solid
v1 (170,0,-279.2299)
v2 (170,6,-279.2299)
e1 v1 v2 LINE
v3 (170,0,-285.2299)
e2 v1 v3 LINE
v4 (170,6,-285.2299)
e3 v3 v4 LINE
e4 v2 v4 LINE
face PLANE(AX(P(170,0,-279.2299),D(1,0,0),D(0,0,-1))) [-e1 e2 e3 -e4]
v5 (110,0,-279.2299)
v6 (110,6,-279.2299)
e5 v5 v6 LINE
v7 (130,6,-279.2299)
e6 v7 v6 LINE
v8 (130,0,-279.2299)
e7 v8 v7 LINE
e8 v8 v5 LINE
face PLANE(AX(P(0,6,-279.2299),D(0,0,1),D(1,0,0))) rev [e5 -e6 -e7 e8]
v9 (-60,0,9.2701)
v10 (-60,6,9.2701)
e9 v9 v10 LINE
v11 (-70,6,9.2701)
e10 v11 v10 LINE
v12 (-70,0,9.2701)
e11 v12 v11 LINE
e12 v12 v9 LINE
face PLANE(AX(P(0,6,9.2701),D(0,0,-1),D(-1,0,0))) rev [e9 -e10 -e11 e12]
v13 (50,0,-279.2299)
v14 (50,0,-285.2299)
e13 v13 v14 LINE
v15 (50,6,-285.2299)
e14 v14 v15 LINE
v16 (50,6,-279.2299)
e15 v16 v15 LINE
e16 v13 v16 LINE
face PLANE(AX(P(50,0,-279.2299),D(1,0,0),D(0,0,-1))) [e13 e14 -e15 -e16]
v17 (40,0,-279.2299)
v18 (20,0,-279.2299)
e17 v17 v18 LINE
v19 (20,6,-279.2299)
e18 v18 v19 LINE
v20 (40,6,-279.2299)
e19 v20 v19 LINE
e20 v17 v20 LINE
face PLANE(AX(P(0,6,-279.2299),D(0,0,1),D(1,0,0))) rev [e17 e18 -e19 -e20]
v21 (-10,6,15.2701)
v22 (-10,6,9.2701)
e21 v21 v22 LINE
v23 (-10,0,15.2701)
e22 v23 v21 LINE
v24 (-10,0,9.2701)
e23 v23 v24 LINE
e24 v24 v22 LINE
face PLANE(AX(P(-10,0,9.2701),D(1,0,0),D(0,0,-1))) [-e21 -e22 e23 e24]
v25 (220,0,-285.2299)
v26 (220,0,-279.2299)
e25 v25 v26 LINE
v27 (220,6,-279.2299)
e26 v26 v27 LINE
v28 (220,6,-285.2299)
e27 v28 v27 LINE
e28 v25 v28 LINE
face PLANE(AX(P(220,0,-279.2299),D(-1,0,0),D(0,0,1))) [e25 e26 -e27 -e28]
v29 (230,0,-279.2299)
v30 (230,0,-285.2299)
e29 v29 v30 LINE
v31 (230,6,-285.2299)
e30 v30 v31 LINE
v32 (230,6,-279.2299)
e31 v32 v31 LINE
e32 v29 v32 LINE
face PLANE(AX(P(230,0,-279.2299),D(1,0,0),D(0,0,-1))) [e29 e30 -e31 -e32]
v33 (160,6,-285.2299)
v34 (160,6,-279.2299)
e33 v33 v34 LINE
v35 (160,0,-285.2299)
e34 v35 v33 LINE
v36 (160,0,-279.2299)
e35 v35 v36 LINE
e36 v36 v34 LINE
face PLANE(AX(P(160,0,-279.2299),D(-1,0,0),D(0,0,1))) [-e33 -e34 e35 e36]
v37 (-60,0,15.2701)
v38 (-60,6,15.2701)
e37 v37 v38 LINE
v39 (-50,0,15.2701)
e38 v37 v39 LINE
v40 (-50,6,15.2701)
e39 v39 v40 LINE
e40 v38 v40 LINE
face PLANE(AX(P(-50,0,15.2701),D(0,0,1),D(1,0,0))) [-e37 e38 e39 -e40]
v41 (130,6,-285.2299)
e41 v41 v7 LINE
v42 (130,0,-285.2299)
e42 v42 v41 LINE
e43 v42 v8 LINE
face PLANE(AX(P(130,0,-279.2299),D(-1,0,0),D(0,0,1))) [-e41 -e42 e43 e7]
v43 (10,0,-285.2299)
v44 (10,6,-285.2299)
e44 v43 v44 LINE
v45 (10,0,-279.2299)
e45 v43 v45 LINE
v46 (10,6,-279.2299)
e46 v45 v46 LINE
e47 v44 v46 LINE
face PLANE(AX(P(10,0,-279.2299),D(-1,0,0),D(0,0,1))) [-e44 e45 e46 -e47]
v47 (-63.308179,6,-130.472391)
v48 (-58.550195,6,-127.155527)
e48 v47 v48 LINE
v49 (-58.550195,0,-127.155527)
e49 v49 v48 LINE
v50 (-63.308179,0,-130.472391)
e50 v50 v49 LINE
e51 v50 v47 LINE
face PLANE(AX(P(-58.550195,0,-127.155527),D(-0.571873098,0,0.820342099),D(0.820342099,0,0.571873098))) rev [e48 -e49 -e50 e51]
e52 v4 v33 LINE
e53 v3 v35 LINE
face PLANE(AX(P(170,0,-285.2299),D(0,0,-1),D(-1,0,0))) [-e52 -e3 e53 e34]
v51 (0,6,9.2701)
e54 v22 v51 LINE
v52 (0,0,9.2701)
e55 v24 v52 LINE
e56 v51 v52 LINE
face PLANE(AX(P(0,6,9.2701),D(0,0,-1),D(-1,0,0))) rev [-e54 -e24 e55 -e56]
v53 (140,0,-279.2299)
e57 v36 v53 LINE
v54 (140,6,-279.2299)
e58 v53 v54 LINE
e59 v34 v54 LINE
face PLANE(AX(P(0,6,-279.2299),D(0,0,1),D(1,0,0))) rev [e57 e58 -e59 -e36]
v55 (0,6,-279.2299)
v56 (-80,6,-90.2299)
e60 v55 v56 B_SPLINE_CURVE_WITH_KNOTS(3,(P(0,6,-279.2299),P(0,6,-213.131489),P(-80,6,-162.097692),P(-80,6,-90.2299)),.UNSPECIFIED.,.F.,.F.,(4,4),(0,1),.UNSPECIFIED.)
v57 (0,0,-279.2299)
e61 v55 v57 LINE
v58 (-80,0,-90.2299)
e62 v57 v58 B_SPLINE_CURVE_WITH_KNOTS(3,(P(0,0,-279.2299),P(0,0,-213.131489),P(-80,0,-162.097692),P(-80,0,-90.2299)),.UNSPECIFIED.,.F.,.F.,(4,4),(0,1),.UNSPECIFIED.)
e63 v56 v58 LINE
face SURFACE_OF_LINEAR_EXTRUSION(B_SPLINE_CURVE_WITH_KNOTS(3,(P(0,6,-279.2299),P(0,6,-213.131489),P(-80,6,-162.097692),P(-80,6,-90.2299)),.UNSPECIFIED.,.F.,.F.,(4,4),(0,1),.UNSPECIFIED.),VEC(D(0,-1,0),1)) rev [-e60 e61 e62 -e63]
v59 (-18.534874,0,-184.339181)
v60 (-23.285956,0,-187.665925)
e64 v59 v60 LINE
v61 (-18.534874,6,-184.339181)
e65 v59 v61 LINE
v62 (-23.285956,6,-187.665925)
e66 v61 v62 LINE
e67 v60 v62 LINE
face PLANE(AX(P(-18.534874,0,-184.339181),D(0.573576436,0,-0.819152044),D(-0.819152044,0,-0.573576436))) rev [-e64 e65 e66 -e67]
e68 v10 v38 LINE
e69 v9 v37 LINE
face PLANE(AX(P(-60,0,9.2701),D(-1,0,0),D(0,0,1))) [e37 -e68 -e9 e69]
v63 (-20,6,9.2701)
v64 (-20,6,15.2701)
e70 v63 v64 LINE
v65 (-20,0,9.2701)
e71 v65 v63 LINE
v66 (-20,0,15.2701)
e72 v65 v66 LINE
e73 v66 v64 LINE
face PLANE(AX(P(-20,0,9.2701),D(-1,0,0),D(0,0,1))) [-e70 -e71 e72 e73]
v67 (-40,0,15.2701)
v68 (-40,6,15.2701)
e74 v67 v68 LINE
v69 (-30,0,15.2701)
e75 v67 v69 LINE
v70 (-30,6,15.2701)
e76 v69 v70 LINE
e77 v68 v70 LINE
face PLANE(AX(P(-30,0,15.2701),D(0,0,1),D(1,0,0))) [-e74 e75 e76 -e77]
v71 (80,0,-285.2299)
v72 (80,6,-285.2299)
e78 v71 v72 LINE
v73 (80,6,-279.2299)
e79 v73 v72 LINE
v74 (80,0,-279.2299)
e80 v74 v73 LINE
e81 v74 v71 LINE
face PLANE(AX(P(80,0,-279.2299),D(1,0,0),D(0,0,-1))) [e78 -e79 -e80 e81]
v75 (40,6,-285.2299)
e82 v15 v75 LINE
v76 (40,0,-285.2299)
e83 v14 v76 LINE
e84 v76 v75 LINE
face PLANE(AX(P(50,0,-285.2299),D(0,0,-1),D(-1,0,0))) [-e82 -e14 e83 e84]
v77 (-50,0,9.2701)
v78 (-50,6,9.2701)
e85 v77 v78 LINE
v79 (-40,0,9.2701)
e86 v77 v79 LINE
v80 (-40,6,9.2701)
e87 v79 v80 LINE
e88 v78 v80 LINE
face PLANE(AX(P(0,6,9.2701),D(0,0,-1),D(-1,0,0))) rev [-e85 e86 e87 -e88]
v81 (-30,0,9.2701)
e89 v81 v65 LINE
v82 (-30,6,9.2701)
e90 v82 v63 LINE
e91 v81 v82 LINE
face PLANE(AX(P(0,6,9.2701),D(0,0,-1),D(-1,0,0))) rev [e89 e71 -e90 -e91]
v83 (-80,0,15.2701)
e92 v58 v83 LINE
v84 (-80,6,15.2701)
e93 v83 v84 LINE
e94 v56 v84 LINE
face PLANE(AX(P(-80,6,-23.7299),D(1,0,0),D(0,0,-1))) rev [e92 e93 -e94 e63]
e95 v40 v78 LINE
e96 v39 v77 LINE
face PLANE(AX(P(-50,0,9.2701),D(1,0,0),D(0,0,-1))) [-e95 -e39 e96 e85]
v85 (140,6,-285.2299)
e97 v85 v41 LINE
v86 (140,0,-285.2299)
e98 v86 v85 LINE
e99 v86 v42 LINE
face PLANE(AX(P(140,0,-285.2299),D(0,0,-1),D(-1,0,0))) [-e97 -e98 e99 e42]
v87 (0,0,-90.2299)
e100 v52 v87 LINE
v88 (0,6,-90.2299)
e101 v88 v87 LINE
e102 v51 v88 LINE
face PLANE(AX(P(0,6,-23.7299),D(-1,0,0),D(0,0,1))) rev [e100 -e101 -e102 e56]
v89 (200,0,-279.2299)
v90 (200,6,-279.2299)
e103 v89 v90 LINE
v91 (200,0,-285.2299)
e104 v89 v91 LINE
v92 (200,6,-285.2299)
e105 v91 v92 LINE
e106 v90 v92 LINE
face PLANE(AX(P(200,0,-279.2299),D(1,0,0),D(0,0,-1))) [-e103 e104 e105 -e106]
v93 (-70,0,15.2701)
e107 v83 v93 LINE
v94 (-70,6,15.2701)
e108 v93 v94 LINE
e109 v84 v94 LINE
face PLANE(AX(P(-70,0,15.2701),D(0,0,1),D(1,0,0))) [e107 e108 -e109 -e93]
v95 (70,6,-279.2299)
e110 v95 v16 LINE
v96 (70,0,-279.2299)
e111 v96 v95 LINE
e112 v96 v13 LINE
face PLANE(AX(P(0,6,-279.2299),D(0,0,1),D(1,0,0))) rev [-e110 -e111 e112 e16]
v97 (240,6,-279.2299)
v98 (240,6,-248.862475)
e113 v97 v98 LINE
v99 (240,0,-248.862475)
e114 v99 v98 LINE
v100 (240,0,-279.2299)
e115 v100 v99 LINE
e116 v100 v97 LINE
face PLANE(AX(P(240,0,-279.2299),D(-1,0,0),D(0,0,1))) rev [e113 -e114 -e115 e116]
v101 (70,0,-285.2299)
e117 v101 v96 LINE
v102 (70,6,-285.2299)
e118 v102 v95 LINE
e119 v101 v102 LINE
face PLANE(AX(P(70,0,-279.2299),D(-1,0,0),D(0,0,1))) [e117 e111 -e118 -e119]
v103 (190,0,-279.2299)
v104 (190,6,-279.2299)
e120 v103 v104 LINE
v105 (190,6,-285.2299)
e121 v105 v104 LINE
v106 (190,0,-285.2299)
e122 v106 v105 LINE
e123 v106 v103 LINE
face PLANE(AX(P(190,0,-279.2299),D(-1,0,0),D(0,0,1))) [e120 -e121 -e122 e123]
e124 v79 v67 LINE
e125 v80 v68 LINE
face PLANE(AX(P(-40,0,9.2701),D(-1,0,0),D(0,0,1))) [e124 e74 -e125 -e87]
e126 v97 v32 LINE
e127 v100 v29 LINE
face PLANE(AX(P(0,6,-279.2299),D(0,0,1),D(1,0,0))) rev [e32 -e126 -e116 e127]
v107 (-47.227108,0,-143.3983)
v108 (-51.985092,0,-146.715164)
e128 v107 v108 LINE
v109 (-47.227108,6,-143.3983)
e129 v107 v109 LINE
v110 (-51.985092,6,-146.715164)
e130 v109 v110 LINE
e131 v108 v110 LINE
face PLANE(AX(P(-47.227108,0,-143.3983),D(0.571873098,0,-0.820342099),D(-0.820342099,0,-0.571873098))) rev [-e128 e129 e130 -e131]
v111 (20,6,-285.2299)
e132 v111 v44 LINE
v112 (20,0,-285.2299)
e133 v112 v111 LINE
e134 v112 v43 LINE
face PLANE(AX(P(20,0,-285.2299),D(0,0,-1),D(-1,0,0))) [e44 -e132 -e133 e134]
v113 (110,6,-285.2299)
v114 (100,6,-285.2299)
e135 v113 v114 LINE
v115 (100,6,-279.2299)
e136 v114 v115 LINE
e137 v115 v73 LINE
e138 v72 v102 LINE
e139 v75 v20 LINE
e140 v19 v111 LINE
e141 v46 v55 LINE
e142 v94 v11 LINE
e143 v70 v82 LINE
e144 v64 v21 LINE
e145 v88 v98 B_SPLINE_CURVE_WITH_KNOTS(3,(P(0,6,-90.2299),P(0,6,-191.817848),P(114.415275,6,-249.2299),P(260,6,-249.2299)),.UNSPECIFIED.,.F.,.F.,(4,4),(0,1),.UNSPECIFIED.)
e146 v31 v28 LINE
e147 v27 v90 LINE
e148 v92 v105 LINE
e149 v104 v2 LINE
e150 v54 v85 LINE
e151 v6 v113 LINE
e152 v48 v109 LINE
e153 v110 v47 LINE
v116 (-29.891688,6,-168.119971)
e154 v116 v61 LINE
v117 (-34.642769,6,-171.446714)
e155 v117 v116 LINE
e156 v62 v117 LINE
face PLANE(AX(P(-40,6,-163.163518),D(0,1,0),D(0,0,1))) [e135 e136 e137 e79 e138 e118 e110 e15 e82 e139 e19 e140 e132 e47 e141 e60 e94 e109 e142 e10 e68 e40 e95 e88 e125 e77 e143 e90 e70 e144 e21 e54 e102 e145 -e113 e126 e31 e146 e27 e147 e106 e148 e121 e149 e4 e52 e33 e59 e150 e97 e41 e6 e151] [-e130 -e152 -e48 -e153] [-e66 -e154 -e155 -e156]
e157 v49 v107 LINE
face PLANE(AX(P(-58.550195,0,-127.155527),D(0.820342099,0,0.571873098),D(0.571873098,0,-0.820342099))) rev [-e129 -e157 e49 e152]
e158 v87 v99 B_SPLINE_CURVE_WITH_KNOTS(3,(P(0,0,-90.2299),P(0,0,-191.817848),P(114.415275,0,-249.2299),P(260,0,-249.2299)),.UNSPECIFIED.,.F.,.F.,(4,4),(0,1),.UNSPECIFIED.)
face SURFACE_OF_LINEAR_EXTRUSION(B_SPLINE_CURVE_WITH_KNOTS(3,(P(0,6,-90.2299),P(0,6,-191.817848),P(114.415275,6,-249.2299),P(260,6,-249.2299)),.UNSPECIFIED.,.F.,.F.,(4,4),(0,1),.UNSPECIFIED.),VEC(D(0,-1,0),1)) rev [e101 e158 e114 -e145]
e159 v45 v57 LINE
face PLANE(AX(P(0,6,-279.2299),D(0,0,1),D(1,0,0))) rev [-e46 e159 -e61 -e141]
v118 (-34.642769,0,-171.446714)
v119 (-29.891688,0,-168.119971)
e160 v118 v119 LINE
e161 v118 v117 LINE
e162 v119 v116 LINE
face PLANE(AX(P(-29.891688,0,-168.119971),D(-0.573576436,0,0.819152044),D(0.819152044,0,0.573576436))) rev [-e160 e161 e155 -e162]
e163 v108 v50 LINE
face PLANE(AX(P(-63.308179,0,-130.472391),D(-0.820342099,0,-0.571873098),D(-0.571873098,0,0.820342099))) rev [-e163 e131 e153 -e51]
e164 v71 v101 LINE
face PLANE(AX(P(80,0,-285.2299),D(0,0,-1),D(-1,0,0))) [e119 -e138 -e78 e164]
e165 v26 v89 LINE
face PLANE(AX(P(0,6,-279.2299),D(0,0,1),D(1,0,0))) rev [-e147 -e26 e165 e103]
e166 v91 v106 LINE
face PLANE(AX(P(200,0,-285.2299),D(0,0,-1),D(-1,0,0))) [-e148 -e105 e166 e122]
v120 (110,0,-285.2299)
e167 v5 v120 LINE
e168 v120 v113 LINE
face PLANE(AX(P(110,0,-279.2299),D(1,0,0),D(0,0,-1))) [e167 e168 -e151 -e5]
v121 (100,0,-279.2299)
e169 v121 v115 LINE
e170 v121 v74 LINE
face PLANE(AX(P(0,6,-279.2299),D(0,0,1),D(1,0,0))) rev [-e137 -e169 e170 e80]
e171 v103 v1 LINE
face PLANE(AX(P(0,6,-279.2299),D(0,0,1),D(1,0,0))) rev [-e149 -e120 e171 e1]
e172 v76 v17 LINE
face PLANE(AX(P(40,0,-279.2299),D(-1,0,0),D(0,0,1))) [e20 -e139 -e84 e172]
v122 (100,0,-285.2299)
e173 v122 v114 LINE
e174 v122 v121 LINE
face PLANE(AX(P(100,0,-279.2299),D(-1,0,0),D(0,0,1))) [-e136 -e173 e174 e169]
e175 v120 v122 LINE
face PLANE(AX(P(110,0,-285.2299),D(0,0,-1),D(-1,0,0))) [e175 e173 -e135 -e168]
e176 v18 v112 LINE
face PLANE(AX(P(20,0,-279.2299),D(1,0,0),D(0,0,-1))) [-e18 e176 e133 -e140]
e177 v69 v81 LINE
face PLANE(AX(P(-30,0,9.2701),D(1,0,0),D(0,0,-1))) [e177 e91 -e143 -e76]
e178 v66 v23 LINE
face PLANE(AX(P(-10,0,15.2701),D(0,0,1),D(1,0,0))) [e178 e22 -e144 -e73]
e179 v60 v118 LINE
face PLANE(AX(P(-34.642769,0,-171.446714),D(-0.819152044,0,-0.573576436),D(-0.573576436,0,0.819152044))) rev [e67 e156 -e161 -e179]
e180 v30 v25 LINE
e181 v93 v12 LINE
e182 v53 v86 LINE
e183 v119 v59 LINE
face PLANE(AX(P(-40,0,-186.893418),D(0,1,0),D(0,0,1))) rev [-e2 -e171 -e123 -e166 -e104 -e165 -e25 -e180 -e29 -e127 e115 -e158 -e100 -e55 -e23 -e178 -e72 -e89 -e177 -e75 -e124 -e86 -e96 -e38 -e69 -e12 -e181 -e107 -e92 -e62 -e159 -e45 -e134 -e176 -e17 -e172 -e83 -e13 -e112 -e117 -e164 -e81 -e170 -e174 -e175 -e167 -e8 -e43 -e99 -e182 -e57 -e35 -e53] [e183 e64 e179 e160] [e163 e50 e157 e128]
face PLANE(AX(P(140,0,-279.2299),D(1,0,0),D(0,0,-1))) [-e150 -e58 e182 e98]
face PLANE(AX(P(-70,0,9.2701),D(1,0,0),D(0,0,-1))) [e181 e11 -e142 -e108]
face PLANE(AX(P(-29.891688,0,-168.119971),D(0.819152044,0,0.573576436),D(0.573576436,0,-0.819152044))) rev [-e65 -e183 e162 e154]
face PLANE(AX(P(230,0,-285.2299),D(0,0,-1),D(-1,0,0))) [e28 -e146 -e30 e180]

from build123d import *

# Parameters (mm, degrees)
BOSS_EXTRUDE1_DEPTH = 6
SKETCH2_W           = 10
SKETCH2_H           = 6
BOSS_EXTRUDE2_DEPTH = 6
SKETCH3_W           = 10
SKETCH3_H           = 6
BOSS_EXTRUDE3_DEPTH = 6
SKETCH4_W           = 20
SKETCH4_H           = 30.367424907
CUT_EXTRUDE1_DEPTH  = 6
CUT_EXTRUDE2_DEPTH  = 355.990492973
FLEX1_DEPTH         = 6
FLEX1_2_DEPTH       = 6


# Read off the part's stored shape, not the designer's step: Flex1
with BuildPart() as part:
    # Sketch1 → Boss-Extrude1 (new body)
    with BuildSketch(Plane(origin=(0, 0, 0), x_dir=(1, 0, 0), z_dir=(0, 1, 0))):
        with BuildLine():
            Line((0, 0), (0, 66.5))
            add(Edge.make_bspline(
                [(0, 66.5), (0, 168.087947667), (114.415275211, 225.5), (260, 225.5)],
                knots=[0, 0, 0, 0, 1, 1, 1, 1], degree=3))
            Line((260, 225.5), (260, 255.5))
            Line((260, 255.5), (0, 255.5))
            add(Edge.make_bspline(
                [(-80, 66.5), (-80, 138.367791909), (0, 189.401588521), (0, 255.5)],
                knots=[0, 0, 0, 0, 1, 1, 1, 1], degree=3))
            Line((-80, 66.5), (-80, 0))
            Line((-80, 0), (0, 0))
        make_face()
    extrude(amount=BOSS_EXTRUDE1_DEPTH)

    # Sketch2 → Boss-Extrude2 (add)
    with BuildSketch(Plane(origin=(0, 6, 0), x_dir=(1, 0, 0), z_dir=(0, 1, 0))):
        with Locations((-35, -3)):
            Rectangle(SKETCH2_W, SKETCH2_H)
        with Locations((-15, -3)):
            Rectangle(SKETCH2_W, SKETCH2_H)
        with Locations((-55, -3)):
            Rectangle(SKETCH2_W, SKETCH2_H)
        with Locations((-75, -3)):
            Rectangle(SKETCH2_W, SKETCH2_H)
    extrude(amount=-BOSS_EXTRUDE2_DEPTH)

    # Sketch3 → Boss-Extrude3 (add)
    with BuildSketch(Plane(origin=(0, 6, 0), x_dir=(1, 0, 0), z_dir=(0, 1, 0))):
        with Locations((195, 258.5)):
            Rectangle(SKETCH3_W, SKETCH3_H)
        with Locations((225, 258.5)):
            Rectangle(SKETCH3_W, SKETCH3_H)
        with Locations((165, 258.5)):
            Rectangle(SKETCH3_W, SKETCH3_H)
        with Locations((135, 258.5)):
            Rectangle(SKETCH3_W, SKETCH3_H)
        with Locations((105, 258.5)):
            Rectangle(SKETCH3_W, SKETCH3_H)
        with Locations((75, 258.5)):
            Rectangle(SKETCH3_W, SKETCH3_H)
        with Locations((45, 258.5)):
            Rectangle(SKETCH3_W, SKETCH3_H)
        with Locations((15, 258.5)):
            Rectangle(SKETCH3_W, SKETCH3_H)
    extrude(amount=-BOSS_EXTRUDE3_DEPTH)

    # Sketch4 → Cut-Extrude1 (cut)
    with BuildSketch(Plane(origin=(0, 6, 0), x_dir=(1, 0, 0), z_dir=(0, 1, 0))):
        with Locations((250, 240.316287547)):
            Rectangle(SKETCH4_W, SKETCH4_H)
    extrude(amount=-CUT_EXTRUDE1_DEPTH, mode=Mode.SUBTRACT)

    # Sketch5 → Cut-Extrude2 (cut, through all)
    with BuildSketch(Plane(origin=(0, 6, 0), x_dir=(1, 0, 0), z_dir=(0, 1, 0))):
        Polygon((-29.891687561, 144.39007032), (-34.642769417, 147.71681365), (-23.285955978, 163.936024127), (-18.534874121, 160.609280796), align=None)
        Polygon((-58.550195169, 103.425626242), (-63.308179345, 106.742490211), (-51.985092004, 122.985263776), (-47.227107828, 119.668399807), align=None)
    extrude(amount=-CUT_EXTRUDE2_DEPTH, mode=Mode.SUBTRACT)

    # Flex1 outline → Flex1 (cut)
    with BuildSketch(Plane(origin=(0, 0, 0), x_dir=(1, 0, 0), z_dir=(0, 1, 0))):
        with BuildLine():
            add(Edge.make_bspline(
                [(0, 90.229900389), (0, 187.117415556), (104.072328665, 243.822461296), (240.00000001, 248.862475483)],
                knots=[0, 0, 0, 0, 0.953730412, 0.953730412, 0.953730412, 0.953730412], degree=3))
            Line((0, 90.229900389), (0, 66.5))
            add(Edge.make_bspline(
                [(0, 66.5), (0, 163.387515167), (104.072328665, 220.092560907), (240.00000001, 225.132575093)],
                knots=[0, 0, 0, 0, 0.953730412, 0.953730412, 0.953730412, 0.953730412], degree=3))
            Line((240.00000001, 225.132575093), (240.00000001, 248.862475483))
        make_face()
        with BuildLine():
            add(Edge.make_bspline(
                [(-51.148803226, 146.132174392), (-54.710438553, 140.513781755), (-58.143911828, 134.842056067), (-61.323392575, 129.088765208)],
                knots=[0.594014657, 0.594014657, 0.594014657, 0.594014657, 0.686318961, 0.686318961, 0.686318961, 0.686318961], degree=3))
            Line((-61.323392575, 129.088765208), (-58.550195169, 127.155526632))
            Line((-58.550195169, 127.155526632), (-47.227107828, 143.398300196))
            Line((-47.227107828, 143.398300196), (-51.148803226, 146.132174392))
        make_face()
        with BuildLine():
            add(Edge.make_bspline(
                [(-31.878447999, 175.394574164), (-32.758957733, 174.05373382), (-33.644948776, 172.71267215), (-34.534615872, 171.370984112)],
                knots=[0.431899292, 0.431899292, 0.431899292, 0.431899292, 0.454328108, 0.454328108, 0.454328108, 0.454328108], degree=3))
            Line((-34.534615872, 171.370984112), (-29.891687561, 168.119970709))
            Line((-29.891687561, 168.119970709), (-18.534874121, 184.339181186))
            Line((-18.534874121, 184.339181186), (-23.285955978, 187.665924517))
            Line((-23.285955978, 187.665924517), (-31.878447999, 175.394574164))
        make_face()
    extrude(amount=FLEX1_DEPTH, mode=Mode.SUBTRACT)

    # Flex1 2 outline → Flex1 2 (add)
    with BuildSketch(Plane(origin=(0, 0, 0), x_dir=(1, 0, 0), z_dir=(0, 1, 0))):
        with BuildLine():
            Line((230, 255.5), (240, 255.5))
            Line((240, 255.5), (240, 279.229900389))
            Line((240, 279.229900389), (230, 279.229900389))
            Line((230, 279.229900389), (230, 285.229900389))
            Line((230, 285.229900389), (220, 285.229900389))
            Line((220, 285.229900389), (220, 279.229900389))
            Line((220, 279.229900389), (200, 279.229900389))
            Line((200, 279.229900389), (200, 285.229900389))
            Line((200, 285.229900389), (190, 285.229900389))
            Line((190, 285.229900389), (190, 279.229900389))
            Line((190, 279.229900389), (170, 279.229900389))
            Line((170, 279.229900389), (170, 285.229900389))
            Line((170, 285.229900389), (160, 285.229900389))
            Line((160, 285.229900389), (160, 279.229900389))
            Line((160, 279.229900389), (140, 279.229900389))
            Line((140, 279.229900389), (140, 285.229900389))
            Line((140, 285.229900389), (130, 285.229900389))
            Line((130, 285.229900389), (130, 279.229900389))
            Line((130, 279.229900389), (110, 279.229900389))
            Line((110, 279.229900389), (110, 285.229900389))
            Line((110, 285.229900389), (100, 285.229900389))
            Line((100, 285.229900389), (100, 279.229900389))
            Line((100, 279.229900389), (80, 279.229900389))
            Line((80, 279.229900389), (80, 285.229900389))
            Line((80, 285.229900389), (70, 285.229900389))
            Line((70, 285.229900389), (70, 279.229900389))
            Line((70, 279.229900389), (50, 279.229900389))
            Line((50, 279.229900389), (50, 285.229900389))
            Line((50, 285.229900389), (40, 285.229900389))
            Line((40, 285.229900389), (40, 279.229900389))
            Line((40, 279.229900389), (20, 279.229900389))
            Line((20, 279.229900389), (20, 285.229900389))
            Line((20, 285.229900389), (10, 285.229900389))
            Line((10, 285.229900389), (10, 279.229900389))
            Line((10, 279.229900389), (0, 279.229900389))
            add(Edge.make_bspline(
                [(0, 279.229900389), (0, 213.131488911), (-80, 162.097692299), (-80, 90.229900389)],
                knots=[0, 0, 0, 0, 1, 1, 1, 1], degree=3))
            Line((-80, 90.229900389), (-80, 66.5))
            add(Edge.make_bspline(
                [(-61.323392575, 129.088765208), (-72.12833646, 109.537149765), (-80, 89.04356364), (-80, 66.5)],
                knots=[0.686318961, 0.686318961, 0.686318961, 0.686318961, 1, 1, 1, 1], degree=3))
            Line((-61.323392575, 129.088765208), (-63.308179345, 130.4723906))
            Line((-63.308179345, 130.4723906), (-51.985092004, 146.715164165))
            Line((-51.985092004, 146.715164165), (-51.148803226, 146.132174392))
            add(Edge.make_bspline(
                [(-34.534615872, 171.370984112), (-40.075457788, 163.01495819), (-45.758886122, 154.634636824), (-51.148803226, 146.132174392)],
                knots=[0.454328108, 0.454328108, 0.454328108, 0.454328108, 0.594014657, 0.594014657, 0.594014657, 0.594014657], degree=3))
            Line((-34.534615872, 171.370984112), (-34.642769417, 171.44671404))
            Line((-34.642769417, 171.44671404), (-31.878447999, 175.394574164))
            add(Edge.make_bspline(
                [(0, 255.5), (0, 226.952142889), (-14.922959865, 201.214393816), (-31.878447999, 175.394574164)],
                knots=[0, 0, 0, 0, 0.431899292, 0.431899292, 0.431899292, 0.431899292], degree=3))
            Line((0, 255.5), (10, 255.5))
            Line((10, 255.5), (10, 261.5))
            Line((10, 261.5), (20, 261.5))
            Line((20, 261.5), (20, 255.5))
            Line((20, 255.5), (40, 255.5))
            Line((40, 255.5), (40, 261.5))
            Line((40, 261.5), (50, 261.5))
            Line((50, 261.5), (50, 255.5))
            Line((50, 255.5), (70, 255.5))
            Line((70, 255.5), (70, 261.5))
            Line((70, 261.5), (80, 261.5))
            Line((80, 261.5), (80, 255.5))
            Line((80, 255.5), (100, 255.5))
            Line((100, 255.5), (100, 261.5))
            Line((100, 261.5), (110, 261.5))
            Line((110, 261.5), (110, 255.5))
            Line((110, 255.5), (130, 255.5))
            Line((130, 255.5), (130, 261.5))
            Line((130, 261.5), (140, 261.5))
            Line((140, 261.5), (140, 255.5))
            Line((140, 255.5), (160, 255.5))
            Line((160, 255.5), (160, 261.5))
            Line((160, 261.5), (170, 261.5))
            Line((170, 261.5), (170, 255.5))
            Line((170, 255.5), (190, 255.5))
            Line((190, 255.5), (190, 261.5))
            Line((190, 261.5), (200, 261.5))
            Line((200, 261.5), (200, 255.5))
            Line((200, 255.5), (220, 255.5))
            Line((220, 255.5), (220, 261.5))
            Line((220, 261.5), (230, 261.5))
            Line((230, 261.5), (230, 255.5))
        make_face()
        Polygon((0, -9.270099611), (0, 0), (-10, 0), (-10, -6), (-20, -6), (-20, 0), (-30, 0), (-30, -6), (-40, -6), (-40, 0), (-50, 0), (-50, -6), (-60, -6), (-60, 0), (-70, 0), (-70, -6), (-80, -6), (-80, -15.270099611), (-70, -15.270099611), (-70, -9.270099611), (-60, -9.270099611), (-60, -15.270099611), (-50, -15.270099611), (-50, -9.270099611), (-40, -9.270099611), (-40, -15.270099611), (-30, -15.270099611), (-30, -9.270099611), (-20, -9.270099611), (-20, -15.270099611), (-10, -15.270099611), (-10, -9.270099611), align=None)
        Polygon((-63.308179345, 106.742490211), (-58.550195169, 103.425626242), (-47.227107828, 119.668399807), (-51.985092004, 122.985263776), align=None)
        Polygon((-34.642769417, 147.71681365), (-29.891687561, 144.39007032), (-18.534874121, 160.609280796), (-23.285955978, 163.936024127), align=None)
    extrude(amount=FLEX1_2_DEPTH)


solid = part.part
